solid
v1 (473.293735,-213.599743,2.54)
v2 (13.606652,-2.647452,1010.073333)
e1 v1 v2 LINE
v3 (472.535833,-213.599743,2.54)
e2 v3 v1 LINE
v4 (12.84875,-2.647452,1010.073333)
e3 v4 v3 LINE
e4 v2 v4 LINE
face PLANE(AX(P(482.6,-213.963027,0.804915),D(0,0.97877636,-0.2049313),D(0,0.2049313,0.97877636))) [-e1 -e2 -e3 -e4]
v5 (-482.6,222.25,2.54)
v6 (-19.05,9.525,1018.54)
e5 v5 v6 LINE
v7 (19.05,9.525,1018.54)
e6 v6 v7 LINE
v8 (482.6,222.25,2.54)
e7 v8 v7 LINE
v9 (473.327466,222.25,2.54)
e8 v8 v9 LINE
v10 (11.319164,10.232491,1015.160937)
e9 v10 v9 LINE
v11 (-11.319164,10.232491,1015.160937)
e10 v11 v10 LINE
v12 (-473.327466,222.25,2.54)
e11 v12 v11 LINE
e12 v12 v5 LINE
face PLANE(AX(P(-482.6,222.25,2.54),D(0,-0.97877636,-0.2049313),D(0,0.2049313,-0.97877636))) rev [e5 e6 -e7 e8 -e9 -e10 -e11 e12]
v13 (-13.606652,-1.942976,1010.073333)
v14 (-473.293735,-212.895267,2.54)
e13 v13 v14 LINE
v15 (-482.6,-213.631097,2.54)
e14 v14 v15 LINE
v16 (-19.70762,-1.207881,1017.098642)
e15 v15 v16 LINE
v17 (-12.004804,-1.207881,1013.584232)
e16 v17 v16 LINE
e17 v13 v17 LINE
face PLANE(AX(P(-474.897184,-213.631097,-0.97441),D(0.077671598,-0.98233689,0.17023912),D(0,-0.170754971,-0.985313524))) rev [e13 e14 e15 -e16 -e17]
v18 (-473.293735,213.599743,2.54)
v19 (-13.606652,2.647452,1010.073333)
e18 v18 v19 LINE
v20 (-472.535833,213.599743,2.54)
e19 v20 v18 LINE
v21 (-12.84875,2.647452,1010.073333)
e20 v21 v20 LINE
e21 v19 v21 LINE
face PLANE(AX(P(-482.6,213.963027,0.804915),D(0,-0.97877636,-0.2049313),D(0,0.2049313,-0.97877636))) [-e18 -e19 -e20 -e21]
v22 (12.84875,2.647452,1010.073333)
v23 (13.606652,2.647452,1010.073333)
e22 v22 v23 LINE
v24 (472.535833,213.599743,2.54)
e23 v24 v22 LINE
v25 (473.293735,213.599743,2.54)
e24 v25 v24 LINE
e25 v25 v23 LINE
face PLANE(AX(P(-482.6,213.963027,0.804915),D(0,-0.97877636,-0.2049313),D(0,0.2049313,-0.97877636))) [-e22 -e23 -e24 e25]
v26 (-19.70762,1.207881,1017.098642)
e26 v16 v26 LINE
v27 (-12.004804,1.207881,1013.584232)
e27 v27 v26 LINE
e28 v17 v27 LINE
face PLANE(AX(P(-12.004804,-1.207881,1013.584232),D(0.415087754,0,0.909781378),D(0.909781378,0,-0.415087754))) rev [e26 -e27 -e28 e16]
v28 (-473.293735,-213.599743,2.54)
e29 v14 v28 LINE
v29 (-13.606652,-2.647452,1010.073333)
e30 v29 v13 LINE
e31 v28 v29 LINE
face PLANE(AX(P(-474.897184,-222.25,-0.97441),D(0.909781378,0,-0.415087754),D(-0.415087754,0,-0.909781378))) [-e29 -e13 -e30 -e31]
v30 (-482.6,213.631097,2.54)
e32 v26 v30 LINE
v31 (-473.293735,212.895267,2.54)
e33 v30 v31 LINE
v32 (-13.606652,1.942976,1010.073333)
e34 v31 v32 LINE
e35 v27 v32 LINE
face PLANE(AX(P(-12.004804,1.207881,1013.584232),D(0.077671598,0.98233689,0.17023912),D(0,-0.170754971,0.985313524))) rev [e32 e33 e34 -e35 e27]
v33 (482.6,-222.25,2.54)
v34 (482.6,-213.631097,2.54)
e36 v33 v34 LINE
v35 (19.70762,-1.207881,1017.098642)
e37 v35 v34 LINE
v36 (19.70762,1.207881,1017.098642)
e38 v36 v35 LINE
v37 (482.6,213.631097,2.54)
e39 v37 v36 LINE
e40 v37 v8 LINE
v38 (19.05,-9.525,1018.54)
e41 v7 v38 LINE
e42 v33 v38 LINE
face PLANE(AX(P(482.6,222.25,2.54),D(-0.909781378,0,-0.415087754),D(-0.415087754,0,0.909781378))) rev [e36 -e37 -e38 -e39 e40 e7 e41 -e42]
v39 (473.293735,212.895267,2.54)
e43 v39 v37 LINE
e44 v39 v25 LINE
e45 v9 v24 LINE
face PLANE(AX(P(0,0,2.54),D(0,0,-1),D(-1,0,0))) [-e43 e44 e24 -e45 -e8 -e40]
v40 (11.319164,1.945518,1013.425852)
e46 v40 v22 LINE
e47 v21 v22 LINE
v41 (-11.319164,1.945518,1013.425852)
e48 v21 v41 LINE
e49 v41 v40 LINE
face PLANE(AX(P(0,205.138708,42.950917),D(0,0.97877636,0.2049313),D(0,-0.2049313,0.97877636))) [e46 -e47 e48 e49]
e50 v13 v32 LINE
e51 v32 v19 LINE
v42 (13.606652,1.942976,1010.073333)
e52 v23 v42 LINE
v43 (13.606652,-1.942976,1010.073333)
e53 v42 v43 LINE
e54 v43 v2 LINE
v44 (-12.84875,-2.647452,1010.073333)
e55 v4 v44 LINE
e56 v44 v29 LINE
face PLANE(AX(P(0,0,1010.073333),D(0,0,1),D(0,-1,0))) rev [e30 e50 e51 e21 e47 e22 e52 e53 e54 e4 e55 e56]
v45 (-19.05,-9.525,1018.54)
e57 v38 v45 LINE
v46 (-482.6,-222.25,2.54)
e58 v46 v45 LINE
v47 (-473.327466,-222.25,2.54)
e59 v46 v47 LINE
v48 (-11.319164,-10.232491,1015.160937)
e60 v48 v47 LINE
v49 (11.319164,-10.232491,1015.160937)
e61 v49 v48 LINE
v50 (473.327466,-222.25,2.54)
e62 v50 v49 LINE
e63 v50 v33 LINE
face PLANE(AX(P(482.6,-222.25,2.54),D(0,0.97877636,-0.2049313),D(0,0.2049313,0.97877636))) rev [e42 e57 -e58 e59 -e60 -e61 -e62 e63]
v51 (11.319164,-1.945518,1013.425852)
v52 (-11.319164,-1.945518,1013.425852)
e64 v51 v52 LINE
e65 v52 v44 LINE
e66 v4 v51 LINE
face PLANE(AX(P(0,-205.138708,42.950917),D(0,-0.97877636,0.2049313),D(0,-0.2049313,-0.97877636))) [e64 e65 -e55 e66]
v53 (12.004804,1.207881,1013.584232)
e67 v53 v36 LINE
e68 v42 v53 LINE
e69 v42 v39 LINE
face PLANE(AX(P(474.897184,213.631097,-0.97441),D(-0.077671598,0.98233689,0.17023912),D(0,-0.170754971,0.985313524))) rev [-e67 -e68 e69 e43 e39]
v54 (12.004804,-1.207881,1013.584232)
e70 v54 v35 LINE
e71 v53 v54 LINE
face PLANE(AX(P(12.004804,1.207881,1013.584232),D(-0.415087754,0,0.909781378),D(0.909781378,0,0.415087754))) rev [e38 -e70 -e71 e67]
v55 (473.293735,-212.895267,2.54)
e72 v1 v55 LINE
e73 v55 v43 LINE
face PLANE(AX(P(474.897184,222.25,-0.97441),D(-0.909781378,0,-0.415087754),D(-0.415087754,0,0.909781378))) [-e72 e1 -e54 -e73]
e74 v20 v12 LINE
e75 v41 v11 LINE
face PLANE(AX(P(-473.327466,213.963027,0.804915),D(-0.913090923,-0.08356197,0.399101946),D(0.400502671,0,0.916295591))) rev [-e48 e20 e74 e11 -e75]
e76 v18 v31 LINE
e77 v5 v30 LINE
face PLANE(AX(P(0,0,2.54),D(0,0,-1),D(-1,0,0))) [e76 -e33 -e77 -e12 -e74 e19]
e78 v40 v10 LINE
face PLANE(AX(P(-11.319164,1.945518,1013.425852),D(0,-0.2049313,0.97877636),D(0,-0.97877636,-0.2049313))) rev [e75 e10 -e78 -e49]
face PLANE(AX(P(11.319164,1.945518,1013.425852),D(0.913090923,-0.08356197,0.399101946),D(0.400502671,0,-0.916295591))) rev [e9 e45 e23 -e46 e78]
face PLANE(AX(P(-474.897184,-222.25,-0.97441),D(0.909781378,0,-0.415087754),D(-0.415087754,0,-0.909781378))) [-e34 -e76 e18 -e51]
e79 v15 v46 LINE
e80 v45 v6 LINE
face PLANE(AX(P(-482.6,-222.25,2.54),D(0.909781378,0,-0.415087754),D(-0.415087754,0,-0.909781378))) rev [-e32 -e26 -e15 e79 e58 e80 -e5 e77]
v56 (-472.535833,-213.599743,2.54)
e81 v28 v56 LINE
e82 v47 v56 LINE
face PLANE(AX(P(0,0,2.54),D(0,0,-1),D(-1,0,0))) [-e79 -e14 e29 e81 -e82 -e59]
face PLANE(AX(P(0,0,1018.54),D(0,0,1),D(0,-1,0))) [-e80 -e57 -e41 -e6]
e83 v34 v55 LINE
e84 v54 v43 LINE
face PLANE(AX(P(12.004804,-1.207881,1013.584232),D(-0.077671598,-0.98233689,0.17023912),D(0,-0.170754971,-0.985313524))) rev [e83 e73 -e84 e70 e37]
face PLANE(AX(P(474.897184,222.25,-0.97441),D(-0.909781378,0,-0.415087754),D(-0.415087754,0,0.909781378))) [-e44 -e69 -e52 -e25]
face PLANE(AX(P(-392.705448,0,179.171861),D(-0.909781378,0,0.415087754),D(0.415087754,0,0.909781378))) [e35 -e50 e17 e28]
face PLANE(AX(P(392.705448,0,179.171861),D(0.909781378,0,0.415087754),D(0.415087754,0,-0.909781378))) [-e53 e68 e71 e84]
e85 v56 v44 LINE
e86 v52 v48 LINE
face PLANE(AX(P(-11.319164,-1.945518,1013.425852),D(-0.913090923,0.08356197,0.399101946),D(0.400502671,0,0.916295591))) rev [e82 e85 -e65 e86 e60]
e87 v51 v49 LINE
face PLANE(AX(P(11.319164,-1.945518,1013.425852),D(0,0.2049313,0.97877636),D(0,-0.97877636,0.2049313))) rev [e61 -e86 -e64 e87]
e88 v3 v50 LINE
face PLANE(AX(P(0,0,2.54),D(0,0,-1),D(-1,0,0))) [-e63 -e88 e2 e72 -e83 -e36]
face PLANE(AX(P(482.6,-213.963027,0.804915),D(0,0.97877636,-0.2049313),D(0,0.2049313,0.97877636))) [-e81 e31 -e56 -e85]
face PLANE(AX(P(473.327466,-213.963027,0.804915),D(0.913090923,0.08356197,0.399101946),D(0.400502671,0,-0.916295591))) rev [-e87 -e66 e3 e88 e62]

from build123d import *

# Parameters (mm, degrees)
SHELL1_T         = -8.466666667
EXTRUSION3_DEPTH = 8.466666667
EXTRUSION4_DEPTH = 8.466666667
EXTRUSION5_DEPTH = 8.466666667
EXTRUSION6_DEPTH = 8.466666667


with BuildPart() as part:
    # Extrusion2: read off the stored shape, not the designer's step
    # Extrusion2: loft between two sections, ruled curve by curve
    extrusion2_from = [
        Edge.make_line((-482.6, -222.25, 2.54), (482.6, -222.25, 2.54)),
        Edge.make_line((-482.6, 222.25, 2.54), (-482.6, -222.25, 2.54)),
        Edge.make_line((482.6, 222.25, 2.54), (-482.6, 222.25, 2.54)),
        Edge.make_line((482.6, -222.25, 2.54), (482.6, 222.25, 2.54)),
    ]
    extrusion2_to = [
        Edge.make_line((-19.05, -9.525, 1018.54), (19.05, -9.525, 1018.54)),
        Edge.make_line((-19.05, 9.525, 1018.54), (-19.05, -9.525, 1018.54)),
        Edge.make_line((19.05, 9.525, 1018.54), (-19.05, 9.525, 1018.54)),
        Edge.make_line((19.05, -9.525, 1018.54), (19.05, 9.525, 1018.54)),
    ]
    extrusion2 = Solid(Shell([*[Face.make_surface_from_curves(extrusion2_from[k], extrusion2_to[k]) for k in range(4)], Face(Wire(extrusion2_from)), Face(Wire(extrusion2_to))]))
    add(extrusion2)

    # Shell1
    shell1_openings = [part.faces().sort_by_distance(p)[0] for p in [
        (0, 0, 2.54),
    ]]
    offset(amount=SHELL1_T, openings=shell1_openings, kind=Kind.INTERSECTION)

    # Sketch2 → Extrusion3 (cut)
    with BuildSketch(Plane(origin=(400.408264089, 0, 182.68627049), x_dir=(0.4150877539122262, 0, -0.9097813784377559), z_dir=(0.909781378437756, 0, 0.41508775391222624))):
        Polygon((-917.157013109, 1.207881), (-917.157013109, -1.207881), (198.010505337, -213.631096694), (198.010505337, 213.631096694), align=None)
    extrude(amount=-EXTRUSION3_DEPTH, mode=Mode.SUBTRACT)

    # Sketch3 → Extrusion4 (cut)
    with BuildSketch(Plane(origin=(-400.408264089, 0, 182.68627049), x_dir=(0.4150877539122262, 0, 0.9097813784377559), z_dir=(-0.909781378437756, 0, 0.41508775391222624))):
        Polygon((917.157013109, -1.207881), (917.157013109, 1.207881), (-198.010505337, 213.631096694), (-198.010505337, -213.631096694), align=None)
    extrude(amount=-EXTRUSION4_DEPTH, mode=Mode.SUBTRACT)

    # Sketch4 → Extrusion5 (cut)
    with BuildSketch(Plane(origin=(0, 213.425680846, 44.686001927), x_dir=(-1, 0, 0), z_dir=(0, 0.9787763596240335, 0.204931300296282))):
        Polygon((-11.319163518, 991.518568451), (-473.327465959, -43.059889537), (473.327465959, -43.059889537), (11.319163518, 991.518568451), align=None)
    extrude(amount=-EXTRUSION5_DEPTH, mode=Mode.SUBTRACT)

    # Sketch5 → Extrusion6 (cut)
    with BuildSketch(Plane(origin=(0, -213.425680846, 44.686001927), x_dir=(1, 0, 0), z_dir=(0, -0.9787763596240335, 0.204931300296282))):
        Polygon((-11.319163518, 991.518568451), (-473.327465959, -43.059889537), (473.327465959, -43.059889537), (11.319163518, 991.518568451), align=None)
    extrude(amount=-EXTRUSION6_DEPTH, mode=Mode.SUBTRACT)


solid = part.part
